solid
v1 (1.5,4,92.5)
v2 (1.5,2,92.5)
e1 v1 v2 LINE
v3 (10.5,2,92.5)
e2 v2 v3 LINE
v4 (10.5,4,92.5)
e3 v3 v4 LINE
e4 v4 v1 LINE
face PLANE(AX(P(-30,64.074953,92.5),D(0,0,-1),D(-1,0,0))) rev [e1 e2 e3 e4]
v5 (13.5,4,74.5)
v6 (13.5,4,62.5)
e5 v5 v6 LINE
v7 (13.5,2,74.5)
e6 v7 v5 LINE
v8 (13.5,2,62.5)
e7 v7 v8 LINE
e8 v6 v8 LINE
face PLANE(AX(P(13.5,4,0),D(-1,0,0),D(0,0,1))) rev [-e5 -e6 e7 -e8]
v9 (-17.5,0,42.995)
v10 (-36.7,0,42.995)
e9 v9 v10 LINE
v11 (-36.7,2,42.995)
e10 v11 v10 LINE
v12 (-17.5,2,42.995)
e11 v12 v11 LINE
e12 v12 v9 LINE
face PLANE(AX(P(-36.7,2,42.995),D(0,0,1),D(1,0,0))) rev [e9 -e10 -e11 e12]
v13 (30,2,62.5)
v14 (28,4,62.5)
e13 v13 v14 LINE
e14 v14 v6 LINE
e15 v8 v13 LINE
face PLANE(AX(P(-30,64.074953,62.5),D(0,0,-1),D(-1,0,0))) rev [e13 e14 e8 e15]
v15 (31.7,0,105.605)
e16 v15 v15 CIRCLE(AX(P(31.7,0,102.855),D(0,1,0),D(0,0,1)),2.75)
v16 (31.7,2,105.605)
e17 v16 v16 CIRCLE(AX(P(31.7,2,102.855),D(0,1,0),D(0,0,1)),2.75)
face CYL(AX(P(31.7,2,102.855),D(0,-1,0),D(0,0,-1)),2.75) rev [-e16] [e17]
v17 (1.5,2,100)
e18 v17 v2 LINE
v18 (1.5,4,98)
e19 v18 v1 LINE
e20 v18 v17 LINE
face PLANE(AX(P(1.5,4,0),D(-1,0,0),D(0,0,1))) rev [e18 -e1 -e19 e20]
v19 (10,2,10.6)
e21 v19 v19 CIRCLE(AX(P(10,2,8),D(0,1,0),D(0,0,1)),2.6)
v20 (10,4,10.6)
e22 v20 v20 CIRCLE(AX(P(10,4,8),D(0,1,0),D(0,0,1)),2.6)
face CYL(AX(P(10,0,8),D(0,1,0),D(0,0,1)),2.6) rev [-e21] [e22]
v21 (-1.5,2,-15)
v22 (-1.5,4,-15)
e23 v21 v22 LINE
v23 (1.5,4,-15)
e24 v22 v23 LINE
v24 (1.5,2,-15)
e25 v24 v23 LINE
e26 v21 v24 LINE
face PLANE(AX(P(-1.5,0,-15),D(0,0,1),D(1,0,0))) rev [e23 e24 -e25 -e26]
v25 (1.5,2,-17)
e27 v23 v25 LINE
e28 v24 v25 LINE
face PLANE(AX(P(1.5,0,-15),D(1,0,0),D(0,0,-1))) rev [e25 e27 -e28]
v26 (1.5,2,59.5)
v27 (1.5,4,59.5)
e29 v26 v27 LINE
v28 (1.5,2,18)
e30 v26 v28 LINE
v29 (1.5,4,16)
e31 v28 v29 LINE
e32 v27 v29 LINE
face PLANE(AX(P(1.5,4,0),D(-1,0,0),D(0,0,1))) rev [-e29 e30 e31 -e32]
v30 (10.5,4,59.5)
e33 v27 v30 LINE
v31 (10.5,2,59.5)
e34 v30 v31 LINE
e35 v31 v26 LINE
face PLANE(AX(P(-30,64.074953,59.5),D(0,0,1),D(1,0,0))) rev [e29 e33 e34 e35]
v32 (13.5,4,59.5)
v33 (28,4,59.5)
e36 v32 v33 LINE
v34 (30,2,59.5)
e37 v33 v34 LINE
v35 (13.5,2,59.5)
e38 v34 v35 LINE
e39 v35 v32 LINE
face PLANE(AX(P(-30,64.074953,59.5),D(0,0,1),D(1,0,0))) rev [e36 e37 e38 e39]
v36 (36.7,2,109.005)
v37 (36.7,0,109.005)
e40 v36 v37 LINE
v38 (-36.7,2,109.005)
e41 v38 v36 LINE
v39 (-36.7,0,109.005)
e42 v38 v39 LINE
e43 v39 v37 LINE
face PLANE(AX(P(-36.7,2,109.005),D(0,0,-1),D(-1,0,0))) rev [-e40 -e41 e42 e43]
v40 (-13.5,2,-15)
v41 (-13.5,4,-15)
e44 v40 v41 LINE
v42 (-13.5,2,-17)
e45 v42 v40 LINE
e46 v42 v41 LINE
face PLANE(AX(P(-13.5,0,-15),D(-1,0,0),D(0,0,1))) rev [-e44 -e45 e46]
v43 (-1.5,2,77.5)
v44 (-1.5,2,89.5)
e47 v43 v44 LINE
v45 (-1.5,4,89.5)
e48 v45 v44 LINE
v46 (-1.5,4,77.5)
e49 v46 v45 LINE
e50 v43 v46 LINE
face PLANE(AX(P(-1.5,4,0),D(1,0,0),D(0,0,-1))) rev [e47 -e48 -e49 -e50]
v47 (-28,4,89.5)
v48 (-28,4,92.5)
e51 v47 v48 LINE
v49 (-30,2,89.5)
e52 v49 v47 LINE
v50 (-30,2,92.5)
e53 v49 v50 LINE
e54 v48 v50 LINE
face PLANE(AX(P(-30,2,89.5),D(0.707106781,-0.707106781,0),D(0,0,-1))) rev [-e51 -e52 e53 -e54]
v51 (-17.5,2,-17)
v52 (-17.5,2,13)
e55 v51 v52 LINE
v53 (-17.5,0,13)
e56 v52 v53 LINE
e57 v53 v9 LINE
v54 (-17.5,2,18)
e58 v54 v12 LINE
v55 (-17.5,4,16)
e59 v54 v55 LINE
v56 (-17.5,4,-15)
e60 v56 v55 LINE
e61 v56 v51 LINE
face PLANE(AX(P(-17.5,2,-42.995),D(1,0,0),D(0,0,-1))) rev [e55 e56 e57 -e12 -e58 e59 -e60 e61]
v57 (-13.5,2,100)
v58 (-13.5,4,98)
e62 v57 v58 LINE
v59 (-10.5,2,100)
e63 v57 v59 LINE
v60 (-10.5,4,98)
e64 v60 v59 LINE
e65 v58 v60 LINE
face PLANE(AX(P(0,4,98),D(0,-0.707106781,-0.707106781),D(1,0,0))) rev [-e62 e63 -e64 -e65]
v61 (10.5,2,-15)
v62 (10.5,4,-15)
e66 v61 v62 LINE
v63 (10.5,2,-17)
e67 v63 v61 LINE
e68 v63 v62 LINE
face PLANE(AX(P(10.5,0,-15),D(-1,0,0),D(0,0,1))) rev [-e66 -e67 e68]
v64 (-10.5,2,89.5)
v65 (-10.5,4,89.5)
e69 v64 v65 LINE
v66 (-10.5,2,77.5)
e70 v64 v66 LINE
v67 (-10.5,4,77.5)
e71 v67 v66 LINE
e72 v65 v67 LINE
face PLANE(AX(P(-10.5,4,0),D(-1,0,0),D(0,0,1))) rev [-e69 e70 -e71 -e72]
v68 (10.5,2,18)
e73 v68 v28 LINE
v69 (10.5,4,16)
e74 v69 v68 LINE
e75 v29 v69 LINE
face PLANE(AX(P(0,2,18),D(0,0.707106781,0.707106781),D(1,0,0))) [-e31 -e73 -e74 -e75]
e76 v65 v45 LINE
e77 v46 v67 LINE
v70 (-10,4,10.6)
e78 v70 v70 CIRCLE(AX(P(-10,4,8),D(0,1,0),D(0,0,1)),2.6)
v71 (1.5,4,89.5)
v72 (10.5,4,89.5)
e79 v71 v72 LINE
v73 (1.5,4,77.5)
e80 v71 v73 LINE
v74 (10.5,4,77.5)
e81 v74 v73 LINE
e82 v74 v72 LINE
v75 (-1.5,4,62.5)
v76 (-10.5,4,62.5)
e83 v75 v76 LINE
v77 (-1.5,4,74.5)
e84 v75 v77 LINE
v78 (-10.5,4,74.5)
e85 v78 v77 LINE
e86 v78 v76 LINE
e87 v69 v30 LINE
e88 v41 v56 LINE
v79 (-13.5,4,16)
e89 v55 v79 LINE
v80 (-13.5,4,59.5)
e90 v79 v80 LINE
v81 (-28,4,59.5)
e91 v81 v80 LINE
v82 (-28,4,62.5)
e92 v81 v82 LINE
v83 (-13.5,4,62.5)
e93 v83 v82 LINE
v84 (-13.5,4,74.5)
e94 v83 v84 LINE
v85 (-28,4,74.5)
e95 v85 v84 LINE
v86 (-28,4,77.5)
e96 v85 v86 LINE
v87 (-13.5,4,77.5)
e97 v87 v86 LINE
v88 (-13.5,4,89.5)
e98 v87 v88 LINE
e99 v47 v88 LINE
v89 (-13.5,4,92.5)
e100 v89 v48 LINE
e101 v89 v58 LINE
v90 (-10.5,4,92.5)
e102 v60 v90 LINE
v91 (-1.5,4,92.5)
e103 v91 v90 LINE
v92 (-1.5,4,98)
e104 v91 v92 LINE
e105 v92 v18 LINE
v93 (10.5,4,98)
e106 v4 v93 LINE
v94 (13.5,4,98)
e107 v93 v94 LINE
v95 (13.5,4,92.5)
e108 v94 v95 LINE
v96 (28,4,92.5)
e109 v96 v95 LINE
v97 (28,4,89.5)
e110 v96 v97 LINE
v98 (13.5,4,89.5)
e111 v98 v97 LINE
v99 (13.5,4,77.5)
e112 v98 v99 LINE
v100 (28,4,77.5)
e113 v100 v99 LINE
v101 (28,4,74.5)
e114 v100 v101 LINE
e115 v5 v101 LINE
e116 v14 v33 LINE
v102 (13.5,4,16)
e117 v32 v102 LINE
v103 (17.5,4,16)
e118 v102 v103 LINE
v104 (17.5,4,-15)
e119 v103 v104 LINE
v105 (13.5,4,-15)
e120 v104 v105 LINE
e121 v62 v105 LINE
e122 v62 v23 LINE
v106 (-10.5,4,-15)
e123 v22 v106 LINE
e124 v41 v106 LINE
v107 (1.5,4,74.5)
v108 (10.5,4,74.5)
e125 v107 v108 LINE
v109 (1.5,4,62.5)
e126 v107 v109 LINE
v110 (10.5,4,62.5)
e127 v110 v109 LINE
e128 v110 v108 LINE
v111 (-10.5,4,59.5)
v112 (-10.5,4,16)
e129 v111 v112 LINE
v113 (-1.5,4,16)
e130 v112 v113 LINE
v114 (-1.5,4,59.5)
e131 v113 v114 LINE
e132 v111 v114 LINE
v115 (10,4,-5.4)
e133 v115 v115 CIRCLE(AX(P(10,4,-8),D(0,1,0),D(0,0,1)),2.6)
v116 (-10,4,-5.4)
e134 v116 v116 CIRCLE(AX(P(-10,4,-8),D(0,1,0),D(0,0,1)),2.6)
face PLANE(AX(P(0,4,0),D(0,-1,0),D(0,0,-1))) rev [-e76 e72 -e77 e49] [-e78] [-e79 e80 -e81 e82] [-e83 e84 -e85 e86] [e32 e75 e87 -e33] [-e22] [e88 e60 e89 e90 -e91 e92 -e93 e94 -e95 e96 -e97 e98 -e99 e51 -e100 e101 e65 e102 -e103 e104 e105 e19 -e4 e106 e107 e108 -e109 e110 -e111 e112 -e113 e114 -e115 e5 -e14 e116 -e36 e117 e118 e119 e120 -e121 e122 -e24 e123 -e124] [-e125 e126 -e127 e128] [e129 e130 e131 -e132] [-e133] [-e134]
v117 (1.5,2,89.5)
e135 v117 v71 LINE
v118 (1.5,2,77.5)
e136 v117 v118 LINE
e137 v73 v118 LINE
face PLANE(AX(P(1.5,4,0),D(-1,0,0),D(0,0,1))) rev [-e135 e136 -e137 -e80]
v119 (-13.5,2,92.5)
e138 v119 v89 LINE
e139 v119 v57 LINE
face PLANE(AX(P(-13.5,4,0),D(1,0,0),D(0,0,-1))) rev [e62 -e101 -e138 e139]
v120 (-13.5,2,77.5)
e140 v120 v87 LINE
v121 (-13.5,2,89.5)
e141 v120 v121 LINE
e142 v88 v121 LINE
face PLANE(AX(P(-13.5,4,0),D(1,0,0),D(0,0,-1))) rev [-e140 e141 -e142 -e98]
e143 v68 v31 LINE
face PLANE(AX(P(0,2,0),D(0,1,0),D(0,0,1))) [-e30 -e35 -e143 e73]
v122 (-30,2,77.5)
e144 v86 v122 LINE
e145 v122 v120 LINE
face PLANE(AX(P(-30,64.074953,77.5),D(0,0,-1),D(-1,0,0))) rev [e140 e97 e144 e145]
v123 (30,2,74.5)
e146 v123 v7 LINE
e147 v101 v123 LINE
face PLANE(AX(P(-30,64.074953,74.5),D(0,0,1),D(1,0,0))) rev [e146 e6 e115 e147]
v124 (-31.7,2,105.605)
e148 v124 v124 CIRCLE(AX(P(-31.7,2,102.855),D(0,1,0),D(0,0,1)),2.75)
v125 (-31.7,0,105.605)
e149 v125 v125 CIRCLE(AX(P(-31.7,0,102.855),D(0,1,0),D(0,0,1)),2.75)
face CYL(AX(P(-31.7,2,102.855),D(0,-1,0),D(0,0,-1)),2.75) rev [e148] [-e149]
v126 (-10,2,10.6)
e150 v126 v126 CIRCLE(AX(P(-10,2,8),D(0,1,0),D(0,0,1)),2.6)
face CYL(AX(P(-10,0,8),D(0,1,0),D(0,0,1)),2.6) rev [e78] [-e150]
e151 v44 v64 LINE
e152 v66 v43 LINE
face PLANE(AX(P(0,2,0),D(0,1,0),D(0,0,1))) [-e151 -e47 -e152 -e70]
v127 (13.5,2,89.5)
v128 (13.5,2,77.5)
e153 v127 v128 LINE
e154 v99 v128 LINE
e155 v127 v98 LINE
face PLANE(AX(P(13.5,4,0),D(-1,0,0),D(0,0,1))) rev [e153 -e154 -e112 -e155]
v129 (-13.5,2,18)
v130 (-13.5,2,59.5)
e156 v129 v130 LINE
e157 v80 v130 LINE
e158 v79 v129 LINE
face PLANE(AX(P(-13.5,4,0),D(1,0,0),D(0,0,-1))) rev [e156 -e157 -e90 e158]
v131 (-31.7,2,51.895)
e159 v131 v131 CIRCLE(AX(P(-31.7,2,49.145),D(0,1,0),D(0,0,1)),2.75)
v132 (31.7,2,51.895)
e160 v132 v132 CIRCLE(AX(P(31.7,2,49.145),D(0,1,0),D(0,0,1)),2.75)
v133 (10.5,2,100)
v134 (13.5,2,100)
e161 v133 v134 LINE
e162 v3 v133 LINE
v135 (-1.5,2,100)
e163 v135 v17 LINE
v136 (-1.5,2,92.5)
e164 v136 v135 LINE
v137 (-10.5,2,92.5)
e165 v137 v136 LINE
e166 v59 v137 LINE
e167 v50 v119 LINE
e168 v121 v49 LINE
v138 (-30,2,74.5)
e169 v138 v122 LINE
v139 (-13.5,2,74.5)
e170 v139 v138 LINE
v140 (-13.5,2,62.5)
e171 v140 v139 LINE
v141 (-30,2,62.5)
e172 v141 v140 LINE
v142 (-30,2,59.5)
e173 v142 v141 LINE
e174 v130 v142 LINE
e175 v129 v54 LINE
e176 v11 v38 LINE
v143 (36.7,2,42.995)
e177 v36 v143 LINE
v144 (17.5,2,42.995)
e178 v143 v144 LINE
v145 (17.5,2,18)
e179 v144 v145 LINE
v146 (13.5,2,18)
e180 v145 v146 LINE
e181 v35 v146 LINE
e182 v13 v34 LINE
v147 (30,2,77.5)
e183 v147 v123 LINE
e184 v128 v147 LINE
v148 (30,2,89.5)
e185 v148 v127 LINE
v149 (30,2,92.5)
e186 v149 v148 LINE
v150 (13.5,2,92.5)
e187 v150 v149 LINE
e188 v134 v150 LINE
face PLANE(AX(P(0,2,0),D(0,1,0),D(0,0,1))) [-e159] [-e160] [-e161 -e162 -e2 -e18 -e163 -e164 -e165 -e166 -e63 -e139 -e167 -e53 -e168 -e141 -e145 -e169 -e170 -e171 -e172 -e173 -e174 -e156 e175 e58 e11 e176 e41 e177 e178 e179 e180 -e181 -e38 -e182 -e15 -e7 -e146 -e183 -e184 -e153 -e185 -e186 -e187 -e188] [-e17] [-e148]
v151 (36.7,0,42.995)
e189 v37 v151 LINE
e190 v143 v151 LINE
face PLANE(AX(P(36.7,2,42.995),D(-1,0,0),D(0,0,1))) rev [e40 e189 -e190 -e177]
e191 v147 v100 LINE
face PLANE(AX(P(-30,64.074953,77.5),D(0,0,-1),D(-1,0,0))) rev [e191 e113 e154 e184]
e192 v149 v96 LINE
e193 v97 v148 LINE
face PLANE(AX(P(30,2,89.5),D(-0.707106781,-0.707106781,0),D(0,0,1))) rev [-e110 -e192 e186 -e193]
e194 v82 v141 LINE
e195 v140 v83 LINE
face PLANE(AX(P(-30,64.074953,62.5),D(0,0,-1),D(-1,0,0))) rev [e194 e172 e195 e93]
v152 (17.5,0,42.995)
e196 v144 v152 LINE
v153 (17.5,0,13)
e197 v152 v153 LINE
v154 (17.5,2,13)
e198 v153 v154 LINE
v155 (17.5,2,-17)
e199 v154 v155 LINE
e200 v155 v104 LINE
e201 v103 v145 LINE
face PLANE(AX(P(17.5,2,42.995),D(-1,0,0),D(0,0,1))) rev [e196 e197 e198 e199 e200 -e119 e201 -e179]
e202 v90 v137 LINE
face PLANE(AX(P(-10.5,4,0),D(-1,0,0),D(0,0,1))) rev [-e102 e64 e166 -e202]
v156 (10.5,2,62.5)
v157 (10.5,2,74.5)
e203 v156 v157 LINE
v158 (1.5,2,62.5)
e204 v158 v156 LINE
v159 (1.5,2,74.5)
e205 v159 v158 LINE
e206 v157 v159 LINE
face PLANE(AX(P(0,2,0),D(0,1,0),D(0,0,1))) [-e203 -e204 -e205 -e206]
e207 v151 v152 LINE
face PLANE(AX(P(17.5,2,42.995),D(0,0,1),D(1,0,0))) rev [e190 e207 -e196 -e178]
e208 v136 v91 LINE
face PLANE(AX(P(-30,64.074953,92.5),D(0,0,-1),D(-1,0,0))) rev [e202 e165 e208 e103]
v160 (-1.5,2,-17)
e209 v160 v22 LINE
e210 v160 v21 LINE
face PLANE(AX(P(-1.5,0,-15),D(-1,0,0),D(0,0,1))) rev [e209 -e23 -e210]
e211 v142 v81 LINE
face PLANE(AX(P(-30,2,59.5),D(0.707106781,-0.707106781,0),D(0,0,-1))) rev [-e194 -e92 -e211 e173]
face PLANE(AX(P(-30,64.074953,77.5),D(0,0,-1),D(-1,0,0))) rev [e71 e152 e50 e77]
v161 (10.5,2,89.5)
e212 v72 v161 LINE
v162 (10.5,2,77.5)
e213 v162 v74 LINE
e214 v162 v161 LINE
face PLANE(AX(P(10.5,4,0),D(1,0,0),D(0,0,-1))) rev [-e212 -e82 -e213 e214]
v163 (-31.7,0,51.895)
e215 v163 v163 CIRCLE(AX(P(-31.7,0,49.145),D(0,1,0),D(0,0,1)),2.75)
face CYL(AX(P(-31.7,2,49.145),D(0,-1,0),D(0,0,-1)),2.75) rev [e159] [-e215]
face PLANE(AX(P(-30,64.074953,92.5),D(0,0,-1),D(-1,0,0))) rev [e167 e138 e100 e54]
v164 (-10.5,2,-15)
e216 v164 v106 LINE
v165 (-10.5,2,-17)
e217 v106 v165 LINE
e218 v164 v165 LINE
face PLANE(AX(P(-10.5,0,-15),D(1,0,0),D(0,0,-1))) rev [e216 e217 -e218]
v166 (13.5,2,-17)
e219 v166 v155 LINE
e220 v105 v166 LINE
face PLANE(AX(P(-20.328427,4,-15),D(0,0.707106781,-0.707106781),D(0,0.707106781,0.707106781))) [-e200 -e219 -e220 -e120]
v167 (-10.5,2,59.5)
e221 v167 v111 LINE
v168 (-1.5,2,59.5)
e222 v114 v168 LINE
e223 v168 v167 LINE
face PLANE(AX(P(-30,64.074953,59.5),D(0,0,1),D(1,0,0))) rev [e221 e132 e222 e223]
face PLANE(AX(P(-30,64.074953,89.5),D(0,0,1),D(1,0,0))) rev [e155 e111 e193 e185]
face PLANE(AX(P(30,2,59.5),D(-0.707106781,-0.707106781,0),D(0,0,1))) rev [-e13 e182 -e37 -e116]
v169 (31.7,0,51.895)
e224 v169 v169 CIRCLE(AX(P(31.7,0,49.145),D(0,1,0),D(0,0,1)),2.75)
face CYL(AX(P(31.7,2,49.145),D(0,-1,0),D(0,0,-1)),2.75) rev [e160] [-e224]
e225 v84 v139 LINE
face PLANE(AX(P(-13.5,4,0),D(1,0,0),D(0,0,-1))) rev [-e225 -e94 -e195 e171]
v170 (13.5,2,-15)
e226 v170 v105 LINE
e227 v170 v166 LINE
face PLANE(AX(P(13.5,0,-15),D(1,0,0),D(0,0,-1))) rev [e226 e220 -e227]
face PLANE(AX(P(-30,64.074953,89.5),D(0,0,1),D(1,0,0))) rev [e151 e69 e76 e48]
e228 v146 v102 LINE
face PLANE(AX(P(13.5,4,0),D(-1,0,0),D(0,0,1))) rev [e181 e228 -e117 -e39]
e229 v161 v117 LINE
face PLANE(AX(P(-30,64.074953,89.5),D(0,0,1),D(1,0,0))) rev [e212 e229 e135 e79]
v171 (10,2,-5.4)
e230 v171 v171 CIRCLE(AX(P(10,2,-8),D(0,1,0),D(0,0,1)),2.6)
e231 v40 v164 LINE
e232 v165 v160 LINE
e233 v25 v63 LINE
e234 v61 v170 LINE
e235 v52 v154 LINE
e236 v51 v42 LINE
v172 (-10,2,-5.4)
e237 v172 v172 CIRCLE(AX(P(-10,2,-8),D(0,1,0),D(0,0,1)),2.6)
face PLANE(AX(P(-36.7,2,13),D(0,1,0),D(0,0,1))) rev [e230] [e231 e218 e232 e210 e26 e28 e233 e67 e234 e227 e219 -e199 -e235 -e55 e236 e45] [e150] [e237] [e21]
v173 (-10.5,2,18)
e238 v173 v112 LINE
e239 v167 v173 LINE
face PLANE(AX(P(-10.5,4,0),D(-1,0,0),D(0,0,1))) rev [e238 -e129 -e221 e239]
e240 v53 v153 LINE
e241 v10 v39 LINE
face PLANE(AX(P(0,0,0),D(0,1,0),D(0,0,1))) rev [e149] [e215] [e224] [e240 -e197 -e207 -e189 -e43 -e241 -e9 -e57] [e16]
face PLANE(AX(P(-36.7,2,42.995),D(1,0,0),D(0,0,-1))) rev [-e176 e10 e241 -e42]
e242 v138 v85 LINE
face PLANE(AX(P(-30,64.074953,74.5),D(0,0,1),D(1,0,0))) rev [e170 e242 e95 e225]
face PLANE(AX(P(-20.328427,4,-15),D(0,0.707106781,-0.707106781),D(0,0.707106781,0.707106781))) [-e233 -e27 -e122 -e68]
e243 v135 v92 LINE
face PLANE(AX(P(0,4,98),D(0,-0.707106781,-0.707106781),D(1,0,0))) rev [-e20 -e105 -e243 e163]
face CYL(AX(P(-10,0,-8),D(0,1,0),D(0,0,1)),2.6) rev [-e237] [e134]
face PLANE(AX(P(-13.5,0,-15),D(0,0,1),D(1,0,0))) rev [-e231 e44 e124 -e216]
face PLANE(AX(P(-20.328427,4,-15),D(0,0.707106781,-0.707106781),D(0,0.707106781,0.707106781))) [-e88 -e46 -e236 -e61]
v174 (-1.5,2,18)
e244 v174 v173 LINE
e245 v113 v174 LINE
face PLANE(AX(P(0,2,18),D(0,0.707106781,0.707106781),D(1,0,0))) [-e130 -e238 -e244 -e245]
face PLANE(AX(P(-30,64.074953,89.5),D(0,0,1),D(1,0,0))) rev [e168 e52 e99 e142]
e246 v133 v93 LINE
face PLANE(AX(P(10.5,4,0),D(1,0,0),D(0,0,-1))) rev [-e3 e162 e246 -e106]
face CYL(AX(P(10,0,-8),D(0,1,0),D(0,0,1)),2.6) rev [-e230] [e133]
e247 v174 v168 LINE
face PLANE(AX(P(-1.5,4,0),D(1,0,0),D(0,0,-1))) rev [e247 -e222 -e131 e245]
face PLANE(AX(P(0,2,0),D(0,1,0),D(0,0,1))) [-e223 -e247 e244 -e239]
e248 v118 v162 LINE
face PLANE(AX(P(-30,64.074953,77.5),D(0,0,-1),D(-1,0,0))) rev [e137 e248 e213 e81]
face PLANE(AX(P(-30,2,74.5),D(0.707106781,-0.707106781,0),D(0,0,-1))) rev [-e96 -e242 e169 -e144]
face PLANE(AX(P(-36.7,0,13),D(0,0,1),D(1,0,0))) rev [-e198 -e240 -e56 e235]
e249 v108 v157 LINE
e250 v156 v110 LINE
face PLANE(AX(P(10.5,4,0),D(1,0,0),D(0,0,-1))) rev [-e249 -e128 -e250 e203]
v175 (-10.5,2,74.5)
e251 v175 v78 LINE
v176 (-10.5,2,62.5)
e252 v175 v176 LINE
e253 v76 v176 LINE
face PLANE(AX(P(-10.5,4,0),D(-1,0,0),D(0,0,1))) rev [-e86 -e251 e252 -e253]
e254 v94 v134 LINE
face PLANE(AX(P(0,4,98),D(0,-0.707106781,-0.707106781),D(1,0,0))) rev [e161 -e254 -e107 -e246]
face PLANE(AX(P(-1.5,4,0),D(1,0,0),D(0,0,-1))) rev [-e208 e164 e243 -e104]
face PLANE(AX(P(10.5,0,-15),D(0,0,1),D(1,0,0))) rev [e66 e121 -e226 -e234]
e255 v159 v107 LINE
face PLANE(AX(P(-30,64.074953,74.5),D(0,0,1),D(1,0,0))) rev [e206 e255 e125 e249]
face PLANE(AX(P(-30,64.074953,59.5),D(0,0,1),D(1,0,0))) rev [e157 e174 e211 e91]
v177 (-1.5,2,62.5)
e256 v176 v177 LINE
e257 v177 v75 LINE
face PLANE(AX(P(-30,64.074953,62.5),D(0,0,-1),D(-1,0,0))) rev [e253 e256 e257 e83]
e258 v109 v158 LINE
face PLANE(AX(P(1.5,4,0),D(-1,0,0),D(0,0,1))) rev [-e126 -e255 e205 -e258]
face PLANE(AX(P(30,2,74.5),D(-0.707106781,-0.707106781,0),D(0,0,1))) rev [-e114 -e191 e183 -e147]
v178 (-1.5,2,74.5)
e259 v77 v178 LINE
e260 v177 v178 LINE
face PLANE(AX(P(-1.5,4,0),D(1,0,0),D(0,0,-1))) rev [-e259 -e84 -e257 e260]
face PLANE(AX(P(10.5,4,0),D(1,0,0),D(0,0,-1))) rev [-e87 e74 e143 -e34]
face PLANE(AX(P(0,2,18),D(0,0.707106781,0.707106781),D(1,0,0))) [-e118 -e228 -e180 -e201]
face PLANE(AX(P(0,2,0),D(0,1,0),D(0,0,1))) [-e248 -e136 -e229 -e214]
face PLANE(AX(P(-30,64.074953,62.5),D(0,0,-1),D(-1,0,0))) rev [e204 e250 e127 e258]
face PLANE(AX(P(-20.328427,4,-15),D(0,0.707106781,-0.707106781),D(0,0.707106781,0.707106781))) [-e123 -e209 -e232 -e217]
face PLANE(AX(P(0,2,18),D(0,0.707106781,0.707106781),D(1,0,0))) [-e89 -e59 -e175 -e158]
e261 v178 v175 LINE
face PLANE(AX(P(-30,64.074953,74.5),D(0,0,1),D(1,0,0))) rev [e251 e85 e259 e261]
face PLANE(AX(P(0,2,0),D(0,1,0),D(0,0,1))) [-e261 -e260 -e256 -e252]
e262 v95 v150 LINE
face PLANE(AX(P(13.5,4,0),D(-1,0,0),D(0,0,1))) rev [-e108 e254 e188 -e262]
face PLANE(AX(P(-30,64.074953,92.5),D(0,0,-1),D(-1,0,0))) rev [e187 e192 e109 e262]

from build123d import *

# Parameters (mm, degrees)
SKETCH1_R                = 2.75
BOSS_EXTRUDE1_DEPTH      = 2
SKETCH2_W                = 3
SKETCH2_H                = 100
BOSS_EXTRUDE2_DEPTH      = 2
SKETCH3_W                = 60
SKETCH3_H                = 3
BOSS_EXTRUDE3_DEPTH      = 2
CHAMFER1_SIZE            = 2
CHAMFER1_OF_MIRROR1_SIZE = 2
SKETCH5_W                = 35
SKETCH5_H                = 30
BOSS_EXTRUDE4_DEPTH      = 2
CHAMFER2_SIZE            = 3
CUT_EXTRUDE1_DEPTH       = 122.80201158
CUT_EXTRUDE1_DEPTH_BACK  = 122.80201158
CUT_EXTRUDE2_DEPTH       = 116.086836888
CUT_EXTRUDE2_DEPTH_BACK  = 116.086836888
SKETCH7_R                = 2.6
BOSS_EXTRUDE5_DEPTH      = 35
CUT_EXTRUDE3_DEPTH       = 116.086836888
CUT_EXTRUDE3_DEPTH_BACK  = 116.086836888
SKETCH9_W                = 3
SKETCH9_H                = 2


# Some blends are built 0.0001 mm under size
with BuildPart() as part:
    # Sketch1 → Boss-Extrude1 (new body)
    with BuildSketch(Plane(origin=(0, 0, 0), x_dir=(1, 0, 0), z_dir=(0, 1, 0))):
        Polygon((-17.5, 42.995), (-17.5, -42.995), (-36.7, -42.995), (-36.7, -109.005), (36.7, -109.005), (36.7, -42.995), (17.5, -42.995), (17.5, 42.995), (36.7, 42.995), (36.7, 109.005), (-36.7, 109.005), (-36.7, 42.995), align=None)
        with Locations(Location((-31.7, 102.855, 0), (0, 0, 270))):
            Circle(SKETCH1_R, mode=Mode.SUBTRACT)
        with Locations(Location((-31.7, 49.145, 0), (0, 0, 270))):
            Circle(SKETCH1_R, mode=Mode.SUBTRACT)
        with Locations(Location((31.7, 49.145, 0), (0, 0, 270))):
            Circle(SKETCH1_R, mode=Mode.SUBTRACT)
        with Locations(Location((31.7, 102.855, 0), (0, 0, 270))):
            Circle(SKETCH1_R, mode=Mode.SUBTRACT)
        with Locations(Location((31.7, -102.855, 0), (0, 0, 270))):
            Circle(SKETCH1_R, mode=Mode.SUBTRACT)
        with Locations(Location((31.7, -49.145, 0), (0, 0, 270))):
            Circle(SKETCH1_R, mode=Mode.SUBTRACT)
        with Locations(Location((-31.7, -49.145, 0), (0, 0, 270))):
            Circle(SKETCH1_R, mode=Mode.SUBTRACT)
        with Locations(Location((-31.7, -102.855, 0), (0, 0, 270))):
            Circle(SKETCH1_R, mode=Mode.SUBTRACT)
    extrude(amount=BOSS_EXTRUDE1_DEPTH)

    # Sketch2 → Boss-Extrude2 (add)
    with BuildSketch(Plane(origin=(0, 2, 0), x_dir=(1, 0, 0), z_dir=(0, 1, 0))):
        with Locations((12, -50)):
            Rectangle(SKETCH2_W, SKETCH2_H)
        with Locations((0, -50)):
            Rectangle(SKETCH2_W, SKETCH2_H)
        with Locations((-12, -50)):
            Rectangle(SKETCH2_W, SKETCH2_H)
    boss_extrude2 = extrude(amount=BOSS_EXTRUDE2_DEPTH)

    # Sketch3 → Boss-Extrude3 (add)
    with BuildSketch(Plane(origin=(0, 2, 0), x_dir=(1, 0, 0), z_dir=(0, 1, 0))):
        with Locations((0, -91)):
            Rectangle(SKETCH3_W, SKETCH3_H)
        with Locations((0, -61)):
            Rectangle(SKETCH3_W, SKETCH3_H)
        with Locations((0, -76)):
            Rectangle(SKETCH3_W, SKETCH3_H)
    boss_extrude3 = extrude(amount=BOSS_EXTRUDE3_DEPTH)

    # Chamfer1
    chamfer1_edges = [part.edges().sort_by_distance(p)[0] for p in [
        (30, 4, 61),
        (30, 4, 76),
        (30, 4, 91),
        (12, 4, 100),
        (0, 4, 100),
        (-12, 4, 100),
        (-30, 4, 91),
        (-30, 4, 76),
        (-30, 4, 61),
    ]]
    chamfer(chamfer1_edges, length=CHAMFER1_SIZE - 0.0001)  # a hair under: the kernel refuses the full size

    # Mirror1: Boss-Extrude2, Boss-Extrude3 across plane
    add(boss_extrude2.mirror(Plane.XY))
    add(boss_extrude3.mirror(Plane.XY))

    # Chamfer1 of Mirror1
    chamfer1_of_mirror1_edges = [part.edges().sort_by_distance(p)[0] for p in [
        (30, 4, -61),
        (30, 4, -76),
        (30, 4, -91),
        (12, 4, -100),
        (0, 4, -100),
        (-12, 4, -100),
        (-30, 4, -91),
        (-30, 4, -76),
        (-30, 4, -61),
    ]]
    chamfer(chamfer1_of_mirror1_edges, length=CHAMFER1_OF_MIRROR1_SIZE - 0.0001)  # a hair under: the kernel refuses the full size

    # Sketch5 → Boss-Extrude4 (add)
    with BuildSketch(Plane(origin=(0, 4, 0), x_dir=(1, 0, 0), z_dir=(0, 1, 0))):
        Rectangle(SKETCH5_W, SKETCH5_H)
    extrude(amount=-BOSS_EXTRUDE4_DEPTH)

    # Chamfer2
    # the kernel refuses this chamfer: 3 mm, written as the material it adds along each edge
    with BuildSketch(Plane(origin=(17.5, 2, 15), x_dir=(0, 0.9996219169112969, -0.027495876610586202), z_dir=(-1, 0, 0))) as chamfer2_piece_1_section:
        Polygon((CHAMFER2_SIZE * 0.999621916911, -CHAMFER2_SIZE * 0.0274958766106), (-CHAMFER2_SIZE * 0.0274958766106, -CHAMFER2_SIZE * 0.999621916911), (0, 0), align=None)
    chamfer2_piece_1 = extrude(amount=11.715048964, mode=Mode.PRIVATE)
    chamfer2_piece_1 = split(chamfer2_piece_1, bisect_by=Plane(origin=(15.5, 4, 16.092091005), z_dir=(0, -1, 0)), keep=Keep.TOP, mode=Mode.PRIVATE)
    add(chamfer2_piece_1)
    with BuildSketch(Plane(origin=(18.215048964, 2, 15), x_dir=(0, 0.9996219169112969, -0.027495876610586202), z_dir=(-1, 0, 0))) as chamfer2_piece_2_section:
        Polygon((CHAMFER2_SIZE * 0.999621916911, -CHAMFER2_SIZE * 0.0274958766106), (-CHAMFER2_SIZE * 0.0274958766106, -CHAMFER2_SIZE * 0.999621916911), (0, 0), align=None)
    chamfer2_piece_2 = extrude(amount=24.430097928, mode=Mode.PRIVATE)
    chamfer2_piece_2 = split(chamfer2_piece_2, bisect_by=Plane(origin=(14, 4, 16.092091005), z_dir=(0, -1, 0)), keep=Keep.TOP, mode=Mode.PRIVATE)
    chamfer2_piece_2 = split(chamfer2_piece_2, bisect_by=Plane(origin=(17.5, 2.79312586, 16.092091005), z_dir=(-1, 0, 0)), keep=Keep.TOP, mode=Mode.PRIVATE)
    add(chamfer2_piece_2)
    with BuildSketch(Plane(origin=(6.215048964, 2, 15), x_dir=(0, 0.9996219169112969, -0.027495876610586202), z_dir=(-1, 0, 0))) as chamfer2_piece_3_section:
        Polygon((CHAMFER2_SIZE * 0.999621916911, -CHAMFER2_SIZE * 0.0274958766106), (-CHAMFER2_SIZE * 0.0274958766106, -CHAMFER2_SIZE * 0.999621916911), (0, 0), align=None)
    chamfer2_piece_3 = extrude(amount=24.430097928, mode=Mode.PRIVATE)
    chamfer2_piece_3 = split(chamfer2_piece_3, bisect_by=Plane(origin=(2.357524482, 4, 16.092091005), z_dir=(0, -1, 0)), keep=Keep.TOP, mode=Mode.PRIVATE)
    chamfer2_piece_3 = split(chamfer2_piece_3, bisect_by=Plane(origin=(-17.5, 2.79312586, 16.092091005), z_dir=(1, 0, 0)), keep=Keep.TOP, mode=Mode.PRIVATE)
    add(chamfer2_piece_3)
    with BuildSketch(Plane(origin=(-5.784951036, 2, 15), x_dir=(0, 0.9996219169112969, -0.027495876610586202), z_dir=(-1, 0, 0))) as chamfer2_piece_4_section:
        Polygon((CHAMFER2_SIZE * 0.999621916911, -CHAMFER2_SIZE * 0.0274958766106), (-CHAMFER2_SIZE * 0.0274958766106, -CHAMFER2_SIZE * 0.999621916911), (0, 0), align=None)
    chamfer2_piece_4 = extrude(amount=11.715048964, mode=Mode.PRIVATE)
    chamfer2_piece_4 = split(chamfer2_piece_4, bisect_by=Plane(origin=(-9.642475518, 4, 16.092091005), z_dir=(0, -1, 0)), keep=Keep.TOP, mode=Mode.PRIVATE)
    add(chamfer2_piece_4)

    # Sketch6 → Cut-Extrude1 (cut, two sides: drawn at the far end of the back side and taken through both)
    with BuildSketch(Plane(origin=(17.5, 0, 0), x_dir=(0, 0, -1), z_dir=(1, 0, 0)).offset(-CUT_EXTRUDE1_DEPTH_BACK)):
        Polygon((-13, 0), (-13, 2), (15, 2), (15, 4), (109.005, 4), (109.005, 0), align=None)
    extrude(amount=CUT_EXTRUDE1_DEPTH + CUT_EXTRUDE1_DEPTH_BACK, mode=Mode.SUBTRACT)

    # Sketch7 → Cut-Extrude2 (cut, two sides: drawn at the far end of the back side and taken through both)
    with BuildSketch(Plane(origin=(0, 4, 0), x_dir=(1, 0, 0), z_dir=(0, 1, 0)).offset(-CUT_EXTRUDE2_DEPTH_BACK)):
        with Locations(Location((-10, -8, 0), (0, 0, 270))):
            Circle(SKETCH7_R)
        with Locations(Location((-10, 8, 0), (0, 0, 270))):
            Circle(SKETCH7_R)
        with Locations(Location((10, 8, 0), (0, 0, 270))):
            Circle(SKETCH7_R)
        with Locations(Location((10, -8, 0), (0, 0, 270))):
            Circle(SKETCH7_R)
    extrude(amount=CUT_EXTRUDE2_DEPTH + CUT_EXTRUDE2_DEPTH_BACK, mode=Mode.SUBTRACT)

    # Sketch8 → Boss-Extrude5 (add)
    with BuildSketch(Plane(origin=(17.5, 0, 0), x_dir=(0, 0, -1), z_dir=(1, 0, 0))):
        Polygon((15, 4), (17, 2), (15, 2), align=None)
    extrude(amount=-BOSS_EXTRUDE5_DEPTH)

    # Sketch9 → Cut-Extrude3 (cut, two sides: drawn at the far end of the back side and taken through both)
    with BuildSketch(Plane(origin=(0, 4, 0), x_dir=(1, 0, 0), z_dir=(0, 1, 0)).offset(-CUT_EXTRUDE3_DEPTH_BACK)):
        with Locations((-12, 16)):
            Rectangle(SKETCH9_W, SKETCH9_H)
        with Locations((0, 16)):
            Rectangle(SKETCH9_W, SKETCH9_H)
        with Locations((12, 16)):
            Rectangle(SKETCH9_W, SKETCH9_H)
    extrude(amount=CUT_EXTRUDE3_DEPTH + CUT_EXTRUDE3_DEPTH_BACK, mode=Mode.SUBTRACT)


solid = part.part
